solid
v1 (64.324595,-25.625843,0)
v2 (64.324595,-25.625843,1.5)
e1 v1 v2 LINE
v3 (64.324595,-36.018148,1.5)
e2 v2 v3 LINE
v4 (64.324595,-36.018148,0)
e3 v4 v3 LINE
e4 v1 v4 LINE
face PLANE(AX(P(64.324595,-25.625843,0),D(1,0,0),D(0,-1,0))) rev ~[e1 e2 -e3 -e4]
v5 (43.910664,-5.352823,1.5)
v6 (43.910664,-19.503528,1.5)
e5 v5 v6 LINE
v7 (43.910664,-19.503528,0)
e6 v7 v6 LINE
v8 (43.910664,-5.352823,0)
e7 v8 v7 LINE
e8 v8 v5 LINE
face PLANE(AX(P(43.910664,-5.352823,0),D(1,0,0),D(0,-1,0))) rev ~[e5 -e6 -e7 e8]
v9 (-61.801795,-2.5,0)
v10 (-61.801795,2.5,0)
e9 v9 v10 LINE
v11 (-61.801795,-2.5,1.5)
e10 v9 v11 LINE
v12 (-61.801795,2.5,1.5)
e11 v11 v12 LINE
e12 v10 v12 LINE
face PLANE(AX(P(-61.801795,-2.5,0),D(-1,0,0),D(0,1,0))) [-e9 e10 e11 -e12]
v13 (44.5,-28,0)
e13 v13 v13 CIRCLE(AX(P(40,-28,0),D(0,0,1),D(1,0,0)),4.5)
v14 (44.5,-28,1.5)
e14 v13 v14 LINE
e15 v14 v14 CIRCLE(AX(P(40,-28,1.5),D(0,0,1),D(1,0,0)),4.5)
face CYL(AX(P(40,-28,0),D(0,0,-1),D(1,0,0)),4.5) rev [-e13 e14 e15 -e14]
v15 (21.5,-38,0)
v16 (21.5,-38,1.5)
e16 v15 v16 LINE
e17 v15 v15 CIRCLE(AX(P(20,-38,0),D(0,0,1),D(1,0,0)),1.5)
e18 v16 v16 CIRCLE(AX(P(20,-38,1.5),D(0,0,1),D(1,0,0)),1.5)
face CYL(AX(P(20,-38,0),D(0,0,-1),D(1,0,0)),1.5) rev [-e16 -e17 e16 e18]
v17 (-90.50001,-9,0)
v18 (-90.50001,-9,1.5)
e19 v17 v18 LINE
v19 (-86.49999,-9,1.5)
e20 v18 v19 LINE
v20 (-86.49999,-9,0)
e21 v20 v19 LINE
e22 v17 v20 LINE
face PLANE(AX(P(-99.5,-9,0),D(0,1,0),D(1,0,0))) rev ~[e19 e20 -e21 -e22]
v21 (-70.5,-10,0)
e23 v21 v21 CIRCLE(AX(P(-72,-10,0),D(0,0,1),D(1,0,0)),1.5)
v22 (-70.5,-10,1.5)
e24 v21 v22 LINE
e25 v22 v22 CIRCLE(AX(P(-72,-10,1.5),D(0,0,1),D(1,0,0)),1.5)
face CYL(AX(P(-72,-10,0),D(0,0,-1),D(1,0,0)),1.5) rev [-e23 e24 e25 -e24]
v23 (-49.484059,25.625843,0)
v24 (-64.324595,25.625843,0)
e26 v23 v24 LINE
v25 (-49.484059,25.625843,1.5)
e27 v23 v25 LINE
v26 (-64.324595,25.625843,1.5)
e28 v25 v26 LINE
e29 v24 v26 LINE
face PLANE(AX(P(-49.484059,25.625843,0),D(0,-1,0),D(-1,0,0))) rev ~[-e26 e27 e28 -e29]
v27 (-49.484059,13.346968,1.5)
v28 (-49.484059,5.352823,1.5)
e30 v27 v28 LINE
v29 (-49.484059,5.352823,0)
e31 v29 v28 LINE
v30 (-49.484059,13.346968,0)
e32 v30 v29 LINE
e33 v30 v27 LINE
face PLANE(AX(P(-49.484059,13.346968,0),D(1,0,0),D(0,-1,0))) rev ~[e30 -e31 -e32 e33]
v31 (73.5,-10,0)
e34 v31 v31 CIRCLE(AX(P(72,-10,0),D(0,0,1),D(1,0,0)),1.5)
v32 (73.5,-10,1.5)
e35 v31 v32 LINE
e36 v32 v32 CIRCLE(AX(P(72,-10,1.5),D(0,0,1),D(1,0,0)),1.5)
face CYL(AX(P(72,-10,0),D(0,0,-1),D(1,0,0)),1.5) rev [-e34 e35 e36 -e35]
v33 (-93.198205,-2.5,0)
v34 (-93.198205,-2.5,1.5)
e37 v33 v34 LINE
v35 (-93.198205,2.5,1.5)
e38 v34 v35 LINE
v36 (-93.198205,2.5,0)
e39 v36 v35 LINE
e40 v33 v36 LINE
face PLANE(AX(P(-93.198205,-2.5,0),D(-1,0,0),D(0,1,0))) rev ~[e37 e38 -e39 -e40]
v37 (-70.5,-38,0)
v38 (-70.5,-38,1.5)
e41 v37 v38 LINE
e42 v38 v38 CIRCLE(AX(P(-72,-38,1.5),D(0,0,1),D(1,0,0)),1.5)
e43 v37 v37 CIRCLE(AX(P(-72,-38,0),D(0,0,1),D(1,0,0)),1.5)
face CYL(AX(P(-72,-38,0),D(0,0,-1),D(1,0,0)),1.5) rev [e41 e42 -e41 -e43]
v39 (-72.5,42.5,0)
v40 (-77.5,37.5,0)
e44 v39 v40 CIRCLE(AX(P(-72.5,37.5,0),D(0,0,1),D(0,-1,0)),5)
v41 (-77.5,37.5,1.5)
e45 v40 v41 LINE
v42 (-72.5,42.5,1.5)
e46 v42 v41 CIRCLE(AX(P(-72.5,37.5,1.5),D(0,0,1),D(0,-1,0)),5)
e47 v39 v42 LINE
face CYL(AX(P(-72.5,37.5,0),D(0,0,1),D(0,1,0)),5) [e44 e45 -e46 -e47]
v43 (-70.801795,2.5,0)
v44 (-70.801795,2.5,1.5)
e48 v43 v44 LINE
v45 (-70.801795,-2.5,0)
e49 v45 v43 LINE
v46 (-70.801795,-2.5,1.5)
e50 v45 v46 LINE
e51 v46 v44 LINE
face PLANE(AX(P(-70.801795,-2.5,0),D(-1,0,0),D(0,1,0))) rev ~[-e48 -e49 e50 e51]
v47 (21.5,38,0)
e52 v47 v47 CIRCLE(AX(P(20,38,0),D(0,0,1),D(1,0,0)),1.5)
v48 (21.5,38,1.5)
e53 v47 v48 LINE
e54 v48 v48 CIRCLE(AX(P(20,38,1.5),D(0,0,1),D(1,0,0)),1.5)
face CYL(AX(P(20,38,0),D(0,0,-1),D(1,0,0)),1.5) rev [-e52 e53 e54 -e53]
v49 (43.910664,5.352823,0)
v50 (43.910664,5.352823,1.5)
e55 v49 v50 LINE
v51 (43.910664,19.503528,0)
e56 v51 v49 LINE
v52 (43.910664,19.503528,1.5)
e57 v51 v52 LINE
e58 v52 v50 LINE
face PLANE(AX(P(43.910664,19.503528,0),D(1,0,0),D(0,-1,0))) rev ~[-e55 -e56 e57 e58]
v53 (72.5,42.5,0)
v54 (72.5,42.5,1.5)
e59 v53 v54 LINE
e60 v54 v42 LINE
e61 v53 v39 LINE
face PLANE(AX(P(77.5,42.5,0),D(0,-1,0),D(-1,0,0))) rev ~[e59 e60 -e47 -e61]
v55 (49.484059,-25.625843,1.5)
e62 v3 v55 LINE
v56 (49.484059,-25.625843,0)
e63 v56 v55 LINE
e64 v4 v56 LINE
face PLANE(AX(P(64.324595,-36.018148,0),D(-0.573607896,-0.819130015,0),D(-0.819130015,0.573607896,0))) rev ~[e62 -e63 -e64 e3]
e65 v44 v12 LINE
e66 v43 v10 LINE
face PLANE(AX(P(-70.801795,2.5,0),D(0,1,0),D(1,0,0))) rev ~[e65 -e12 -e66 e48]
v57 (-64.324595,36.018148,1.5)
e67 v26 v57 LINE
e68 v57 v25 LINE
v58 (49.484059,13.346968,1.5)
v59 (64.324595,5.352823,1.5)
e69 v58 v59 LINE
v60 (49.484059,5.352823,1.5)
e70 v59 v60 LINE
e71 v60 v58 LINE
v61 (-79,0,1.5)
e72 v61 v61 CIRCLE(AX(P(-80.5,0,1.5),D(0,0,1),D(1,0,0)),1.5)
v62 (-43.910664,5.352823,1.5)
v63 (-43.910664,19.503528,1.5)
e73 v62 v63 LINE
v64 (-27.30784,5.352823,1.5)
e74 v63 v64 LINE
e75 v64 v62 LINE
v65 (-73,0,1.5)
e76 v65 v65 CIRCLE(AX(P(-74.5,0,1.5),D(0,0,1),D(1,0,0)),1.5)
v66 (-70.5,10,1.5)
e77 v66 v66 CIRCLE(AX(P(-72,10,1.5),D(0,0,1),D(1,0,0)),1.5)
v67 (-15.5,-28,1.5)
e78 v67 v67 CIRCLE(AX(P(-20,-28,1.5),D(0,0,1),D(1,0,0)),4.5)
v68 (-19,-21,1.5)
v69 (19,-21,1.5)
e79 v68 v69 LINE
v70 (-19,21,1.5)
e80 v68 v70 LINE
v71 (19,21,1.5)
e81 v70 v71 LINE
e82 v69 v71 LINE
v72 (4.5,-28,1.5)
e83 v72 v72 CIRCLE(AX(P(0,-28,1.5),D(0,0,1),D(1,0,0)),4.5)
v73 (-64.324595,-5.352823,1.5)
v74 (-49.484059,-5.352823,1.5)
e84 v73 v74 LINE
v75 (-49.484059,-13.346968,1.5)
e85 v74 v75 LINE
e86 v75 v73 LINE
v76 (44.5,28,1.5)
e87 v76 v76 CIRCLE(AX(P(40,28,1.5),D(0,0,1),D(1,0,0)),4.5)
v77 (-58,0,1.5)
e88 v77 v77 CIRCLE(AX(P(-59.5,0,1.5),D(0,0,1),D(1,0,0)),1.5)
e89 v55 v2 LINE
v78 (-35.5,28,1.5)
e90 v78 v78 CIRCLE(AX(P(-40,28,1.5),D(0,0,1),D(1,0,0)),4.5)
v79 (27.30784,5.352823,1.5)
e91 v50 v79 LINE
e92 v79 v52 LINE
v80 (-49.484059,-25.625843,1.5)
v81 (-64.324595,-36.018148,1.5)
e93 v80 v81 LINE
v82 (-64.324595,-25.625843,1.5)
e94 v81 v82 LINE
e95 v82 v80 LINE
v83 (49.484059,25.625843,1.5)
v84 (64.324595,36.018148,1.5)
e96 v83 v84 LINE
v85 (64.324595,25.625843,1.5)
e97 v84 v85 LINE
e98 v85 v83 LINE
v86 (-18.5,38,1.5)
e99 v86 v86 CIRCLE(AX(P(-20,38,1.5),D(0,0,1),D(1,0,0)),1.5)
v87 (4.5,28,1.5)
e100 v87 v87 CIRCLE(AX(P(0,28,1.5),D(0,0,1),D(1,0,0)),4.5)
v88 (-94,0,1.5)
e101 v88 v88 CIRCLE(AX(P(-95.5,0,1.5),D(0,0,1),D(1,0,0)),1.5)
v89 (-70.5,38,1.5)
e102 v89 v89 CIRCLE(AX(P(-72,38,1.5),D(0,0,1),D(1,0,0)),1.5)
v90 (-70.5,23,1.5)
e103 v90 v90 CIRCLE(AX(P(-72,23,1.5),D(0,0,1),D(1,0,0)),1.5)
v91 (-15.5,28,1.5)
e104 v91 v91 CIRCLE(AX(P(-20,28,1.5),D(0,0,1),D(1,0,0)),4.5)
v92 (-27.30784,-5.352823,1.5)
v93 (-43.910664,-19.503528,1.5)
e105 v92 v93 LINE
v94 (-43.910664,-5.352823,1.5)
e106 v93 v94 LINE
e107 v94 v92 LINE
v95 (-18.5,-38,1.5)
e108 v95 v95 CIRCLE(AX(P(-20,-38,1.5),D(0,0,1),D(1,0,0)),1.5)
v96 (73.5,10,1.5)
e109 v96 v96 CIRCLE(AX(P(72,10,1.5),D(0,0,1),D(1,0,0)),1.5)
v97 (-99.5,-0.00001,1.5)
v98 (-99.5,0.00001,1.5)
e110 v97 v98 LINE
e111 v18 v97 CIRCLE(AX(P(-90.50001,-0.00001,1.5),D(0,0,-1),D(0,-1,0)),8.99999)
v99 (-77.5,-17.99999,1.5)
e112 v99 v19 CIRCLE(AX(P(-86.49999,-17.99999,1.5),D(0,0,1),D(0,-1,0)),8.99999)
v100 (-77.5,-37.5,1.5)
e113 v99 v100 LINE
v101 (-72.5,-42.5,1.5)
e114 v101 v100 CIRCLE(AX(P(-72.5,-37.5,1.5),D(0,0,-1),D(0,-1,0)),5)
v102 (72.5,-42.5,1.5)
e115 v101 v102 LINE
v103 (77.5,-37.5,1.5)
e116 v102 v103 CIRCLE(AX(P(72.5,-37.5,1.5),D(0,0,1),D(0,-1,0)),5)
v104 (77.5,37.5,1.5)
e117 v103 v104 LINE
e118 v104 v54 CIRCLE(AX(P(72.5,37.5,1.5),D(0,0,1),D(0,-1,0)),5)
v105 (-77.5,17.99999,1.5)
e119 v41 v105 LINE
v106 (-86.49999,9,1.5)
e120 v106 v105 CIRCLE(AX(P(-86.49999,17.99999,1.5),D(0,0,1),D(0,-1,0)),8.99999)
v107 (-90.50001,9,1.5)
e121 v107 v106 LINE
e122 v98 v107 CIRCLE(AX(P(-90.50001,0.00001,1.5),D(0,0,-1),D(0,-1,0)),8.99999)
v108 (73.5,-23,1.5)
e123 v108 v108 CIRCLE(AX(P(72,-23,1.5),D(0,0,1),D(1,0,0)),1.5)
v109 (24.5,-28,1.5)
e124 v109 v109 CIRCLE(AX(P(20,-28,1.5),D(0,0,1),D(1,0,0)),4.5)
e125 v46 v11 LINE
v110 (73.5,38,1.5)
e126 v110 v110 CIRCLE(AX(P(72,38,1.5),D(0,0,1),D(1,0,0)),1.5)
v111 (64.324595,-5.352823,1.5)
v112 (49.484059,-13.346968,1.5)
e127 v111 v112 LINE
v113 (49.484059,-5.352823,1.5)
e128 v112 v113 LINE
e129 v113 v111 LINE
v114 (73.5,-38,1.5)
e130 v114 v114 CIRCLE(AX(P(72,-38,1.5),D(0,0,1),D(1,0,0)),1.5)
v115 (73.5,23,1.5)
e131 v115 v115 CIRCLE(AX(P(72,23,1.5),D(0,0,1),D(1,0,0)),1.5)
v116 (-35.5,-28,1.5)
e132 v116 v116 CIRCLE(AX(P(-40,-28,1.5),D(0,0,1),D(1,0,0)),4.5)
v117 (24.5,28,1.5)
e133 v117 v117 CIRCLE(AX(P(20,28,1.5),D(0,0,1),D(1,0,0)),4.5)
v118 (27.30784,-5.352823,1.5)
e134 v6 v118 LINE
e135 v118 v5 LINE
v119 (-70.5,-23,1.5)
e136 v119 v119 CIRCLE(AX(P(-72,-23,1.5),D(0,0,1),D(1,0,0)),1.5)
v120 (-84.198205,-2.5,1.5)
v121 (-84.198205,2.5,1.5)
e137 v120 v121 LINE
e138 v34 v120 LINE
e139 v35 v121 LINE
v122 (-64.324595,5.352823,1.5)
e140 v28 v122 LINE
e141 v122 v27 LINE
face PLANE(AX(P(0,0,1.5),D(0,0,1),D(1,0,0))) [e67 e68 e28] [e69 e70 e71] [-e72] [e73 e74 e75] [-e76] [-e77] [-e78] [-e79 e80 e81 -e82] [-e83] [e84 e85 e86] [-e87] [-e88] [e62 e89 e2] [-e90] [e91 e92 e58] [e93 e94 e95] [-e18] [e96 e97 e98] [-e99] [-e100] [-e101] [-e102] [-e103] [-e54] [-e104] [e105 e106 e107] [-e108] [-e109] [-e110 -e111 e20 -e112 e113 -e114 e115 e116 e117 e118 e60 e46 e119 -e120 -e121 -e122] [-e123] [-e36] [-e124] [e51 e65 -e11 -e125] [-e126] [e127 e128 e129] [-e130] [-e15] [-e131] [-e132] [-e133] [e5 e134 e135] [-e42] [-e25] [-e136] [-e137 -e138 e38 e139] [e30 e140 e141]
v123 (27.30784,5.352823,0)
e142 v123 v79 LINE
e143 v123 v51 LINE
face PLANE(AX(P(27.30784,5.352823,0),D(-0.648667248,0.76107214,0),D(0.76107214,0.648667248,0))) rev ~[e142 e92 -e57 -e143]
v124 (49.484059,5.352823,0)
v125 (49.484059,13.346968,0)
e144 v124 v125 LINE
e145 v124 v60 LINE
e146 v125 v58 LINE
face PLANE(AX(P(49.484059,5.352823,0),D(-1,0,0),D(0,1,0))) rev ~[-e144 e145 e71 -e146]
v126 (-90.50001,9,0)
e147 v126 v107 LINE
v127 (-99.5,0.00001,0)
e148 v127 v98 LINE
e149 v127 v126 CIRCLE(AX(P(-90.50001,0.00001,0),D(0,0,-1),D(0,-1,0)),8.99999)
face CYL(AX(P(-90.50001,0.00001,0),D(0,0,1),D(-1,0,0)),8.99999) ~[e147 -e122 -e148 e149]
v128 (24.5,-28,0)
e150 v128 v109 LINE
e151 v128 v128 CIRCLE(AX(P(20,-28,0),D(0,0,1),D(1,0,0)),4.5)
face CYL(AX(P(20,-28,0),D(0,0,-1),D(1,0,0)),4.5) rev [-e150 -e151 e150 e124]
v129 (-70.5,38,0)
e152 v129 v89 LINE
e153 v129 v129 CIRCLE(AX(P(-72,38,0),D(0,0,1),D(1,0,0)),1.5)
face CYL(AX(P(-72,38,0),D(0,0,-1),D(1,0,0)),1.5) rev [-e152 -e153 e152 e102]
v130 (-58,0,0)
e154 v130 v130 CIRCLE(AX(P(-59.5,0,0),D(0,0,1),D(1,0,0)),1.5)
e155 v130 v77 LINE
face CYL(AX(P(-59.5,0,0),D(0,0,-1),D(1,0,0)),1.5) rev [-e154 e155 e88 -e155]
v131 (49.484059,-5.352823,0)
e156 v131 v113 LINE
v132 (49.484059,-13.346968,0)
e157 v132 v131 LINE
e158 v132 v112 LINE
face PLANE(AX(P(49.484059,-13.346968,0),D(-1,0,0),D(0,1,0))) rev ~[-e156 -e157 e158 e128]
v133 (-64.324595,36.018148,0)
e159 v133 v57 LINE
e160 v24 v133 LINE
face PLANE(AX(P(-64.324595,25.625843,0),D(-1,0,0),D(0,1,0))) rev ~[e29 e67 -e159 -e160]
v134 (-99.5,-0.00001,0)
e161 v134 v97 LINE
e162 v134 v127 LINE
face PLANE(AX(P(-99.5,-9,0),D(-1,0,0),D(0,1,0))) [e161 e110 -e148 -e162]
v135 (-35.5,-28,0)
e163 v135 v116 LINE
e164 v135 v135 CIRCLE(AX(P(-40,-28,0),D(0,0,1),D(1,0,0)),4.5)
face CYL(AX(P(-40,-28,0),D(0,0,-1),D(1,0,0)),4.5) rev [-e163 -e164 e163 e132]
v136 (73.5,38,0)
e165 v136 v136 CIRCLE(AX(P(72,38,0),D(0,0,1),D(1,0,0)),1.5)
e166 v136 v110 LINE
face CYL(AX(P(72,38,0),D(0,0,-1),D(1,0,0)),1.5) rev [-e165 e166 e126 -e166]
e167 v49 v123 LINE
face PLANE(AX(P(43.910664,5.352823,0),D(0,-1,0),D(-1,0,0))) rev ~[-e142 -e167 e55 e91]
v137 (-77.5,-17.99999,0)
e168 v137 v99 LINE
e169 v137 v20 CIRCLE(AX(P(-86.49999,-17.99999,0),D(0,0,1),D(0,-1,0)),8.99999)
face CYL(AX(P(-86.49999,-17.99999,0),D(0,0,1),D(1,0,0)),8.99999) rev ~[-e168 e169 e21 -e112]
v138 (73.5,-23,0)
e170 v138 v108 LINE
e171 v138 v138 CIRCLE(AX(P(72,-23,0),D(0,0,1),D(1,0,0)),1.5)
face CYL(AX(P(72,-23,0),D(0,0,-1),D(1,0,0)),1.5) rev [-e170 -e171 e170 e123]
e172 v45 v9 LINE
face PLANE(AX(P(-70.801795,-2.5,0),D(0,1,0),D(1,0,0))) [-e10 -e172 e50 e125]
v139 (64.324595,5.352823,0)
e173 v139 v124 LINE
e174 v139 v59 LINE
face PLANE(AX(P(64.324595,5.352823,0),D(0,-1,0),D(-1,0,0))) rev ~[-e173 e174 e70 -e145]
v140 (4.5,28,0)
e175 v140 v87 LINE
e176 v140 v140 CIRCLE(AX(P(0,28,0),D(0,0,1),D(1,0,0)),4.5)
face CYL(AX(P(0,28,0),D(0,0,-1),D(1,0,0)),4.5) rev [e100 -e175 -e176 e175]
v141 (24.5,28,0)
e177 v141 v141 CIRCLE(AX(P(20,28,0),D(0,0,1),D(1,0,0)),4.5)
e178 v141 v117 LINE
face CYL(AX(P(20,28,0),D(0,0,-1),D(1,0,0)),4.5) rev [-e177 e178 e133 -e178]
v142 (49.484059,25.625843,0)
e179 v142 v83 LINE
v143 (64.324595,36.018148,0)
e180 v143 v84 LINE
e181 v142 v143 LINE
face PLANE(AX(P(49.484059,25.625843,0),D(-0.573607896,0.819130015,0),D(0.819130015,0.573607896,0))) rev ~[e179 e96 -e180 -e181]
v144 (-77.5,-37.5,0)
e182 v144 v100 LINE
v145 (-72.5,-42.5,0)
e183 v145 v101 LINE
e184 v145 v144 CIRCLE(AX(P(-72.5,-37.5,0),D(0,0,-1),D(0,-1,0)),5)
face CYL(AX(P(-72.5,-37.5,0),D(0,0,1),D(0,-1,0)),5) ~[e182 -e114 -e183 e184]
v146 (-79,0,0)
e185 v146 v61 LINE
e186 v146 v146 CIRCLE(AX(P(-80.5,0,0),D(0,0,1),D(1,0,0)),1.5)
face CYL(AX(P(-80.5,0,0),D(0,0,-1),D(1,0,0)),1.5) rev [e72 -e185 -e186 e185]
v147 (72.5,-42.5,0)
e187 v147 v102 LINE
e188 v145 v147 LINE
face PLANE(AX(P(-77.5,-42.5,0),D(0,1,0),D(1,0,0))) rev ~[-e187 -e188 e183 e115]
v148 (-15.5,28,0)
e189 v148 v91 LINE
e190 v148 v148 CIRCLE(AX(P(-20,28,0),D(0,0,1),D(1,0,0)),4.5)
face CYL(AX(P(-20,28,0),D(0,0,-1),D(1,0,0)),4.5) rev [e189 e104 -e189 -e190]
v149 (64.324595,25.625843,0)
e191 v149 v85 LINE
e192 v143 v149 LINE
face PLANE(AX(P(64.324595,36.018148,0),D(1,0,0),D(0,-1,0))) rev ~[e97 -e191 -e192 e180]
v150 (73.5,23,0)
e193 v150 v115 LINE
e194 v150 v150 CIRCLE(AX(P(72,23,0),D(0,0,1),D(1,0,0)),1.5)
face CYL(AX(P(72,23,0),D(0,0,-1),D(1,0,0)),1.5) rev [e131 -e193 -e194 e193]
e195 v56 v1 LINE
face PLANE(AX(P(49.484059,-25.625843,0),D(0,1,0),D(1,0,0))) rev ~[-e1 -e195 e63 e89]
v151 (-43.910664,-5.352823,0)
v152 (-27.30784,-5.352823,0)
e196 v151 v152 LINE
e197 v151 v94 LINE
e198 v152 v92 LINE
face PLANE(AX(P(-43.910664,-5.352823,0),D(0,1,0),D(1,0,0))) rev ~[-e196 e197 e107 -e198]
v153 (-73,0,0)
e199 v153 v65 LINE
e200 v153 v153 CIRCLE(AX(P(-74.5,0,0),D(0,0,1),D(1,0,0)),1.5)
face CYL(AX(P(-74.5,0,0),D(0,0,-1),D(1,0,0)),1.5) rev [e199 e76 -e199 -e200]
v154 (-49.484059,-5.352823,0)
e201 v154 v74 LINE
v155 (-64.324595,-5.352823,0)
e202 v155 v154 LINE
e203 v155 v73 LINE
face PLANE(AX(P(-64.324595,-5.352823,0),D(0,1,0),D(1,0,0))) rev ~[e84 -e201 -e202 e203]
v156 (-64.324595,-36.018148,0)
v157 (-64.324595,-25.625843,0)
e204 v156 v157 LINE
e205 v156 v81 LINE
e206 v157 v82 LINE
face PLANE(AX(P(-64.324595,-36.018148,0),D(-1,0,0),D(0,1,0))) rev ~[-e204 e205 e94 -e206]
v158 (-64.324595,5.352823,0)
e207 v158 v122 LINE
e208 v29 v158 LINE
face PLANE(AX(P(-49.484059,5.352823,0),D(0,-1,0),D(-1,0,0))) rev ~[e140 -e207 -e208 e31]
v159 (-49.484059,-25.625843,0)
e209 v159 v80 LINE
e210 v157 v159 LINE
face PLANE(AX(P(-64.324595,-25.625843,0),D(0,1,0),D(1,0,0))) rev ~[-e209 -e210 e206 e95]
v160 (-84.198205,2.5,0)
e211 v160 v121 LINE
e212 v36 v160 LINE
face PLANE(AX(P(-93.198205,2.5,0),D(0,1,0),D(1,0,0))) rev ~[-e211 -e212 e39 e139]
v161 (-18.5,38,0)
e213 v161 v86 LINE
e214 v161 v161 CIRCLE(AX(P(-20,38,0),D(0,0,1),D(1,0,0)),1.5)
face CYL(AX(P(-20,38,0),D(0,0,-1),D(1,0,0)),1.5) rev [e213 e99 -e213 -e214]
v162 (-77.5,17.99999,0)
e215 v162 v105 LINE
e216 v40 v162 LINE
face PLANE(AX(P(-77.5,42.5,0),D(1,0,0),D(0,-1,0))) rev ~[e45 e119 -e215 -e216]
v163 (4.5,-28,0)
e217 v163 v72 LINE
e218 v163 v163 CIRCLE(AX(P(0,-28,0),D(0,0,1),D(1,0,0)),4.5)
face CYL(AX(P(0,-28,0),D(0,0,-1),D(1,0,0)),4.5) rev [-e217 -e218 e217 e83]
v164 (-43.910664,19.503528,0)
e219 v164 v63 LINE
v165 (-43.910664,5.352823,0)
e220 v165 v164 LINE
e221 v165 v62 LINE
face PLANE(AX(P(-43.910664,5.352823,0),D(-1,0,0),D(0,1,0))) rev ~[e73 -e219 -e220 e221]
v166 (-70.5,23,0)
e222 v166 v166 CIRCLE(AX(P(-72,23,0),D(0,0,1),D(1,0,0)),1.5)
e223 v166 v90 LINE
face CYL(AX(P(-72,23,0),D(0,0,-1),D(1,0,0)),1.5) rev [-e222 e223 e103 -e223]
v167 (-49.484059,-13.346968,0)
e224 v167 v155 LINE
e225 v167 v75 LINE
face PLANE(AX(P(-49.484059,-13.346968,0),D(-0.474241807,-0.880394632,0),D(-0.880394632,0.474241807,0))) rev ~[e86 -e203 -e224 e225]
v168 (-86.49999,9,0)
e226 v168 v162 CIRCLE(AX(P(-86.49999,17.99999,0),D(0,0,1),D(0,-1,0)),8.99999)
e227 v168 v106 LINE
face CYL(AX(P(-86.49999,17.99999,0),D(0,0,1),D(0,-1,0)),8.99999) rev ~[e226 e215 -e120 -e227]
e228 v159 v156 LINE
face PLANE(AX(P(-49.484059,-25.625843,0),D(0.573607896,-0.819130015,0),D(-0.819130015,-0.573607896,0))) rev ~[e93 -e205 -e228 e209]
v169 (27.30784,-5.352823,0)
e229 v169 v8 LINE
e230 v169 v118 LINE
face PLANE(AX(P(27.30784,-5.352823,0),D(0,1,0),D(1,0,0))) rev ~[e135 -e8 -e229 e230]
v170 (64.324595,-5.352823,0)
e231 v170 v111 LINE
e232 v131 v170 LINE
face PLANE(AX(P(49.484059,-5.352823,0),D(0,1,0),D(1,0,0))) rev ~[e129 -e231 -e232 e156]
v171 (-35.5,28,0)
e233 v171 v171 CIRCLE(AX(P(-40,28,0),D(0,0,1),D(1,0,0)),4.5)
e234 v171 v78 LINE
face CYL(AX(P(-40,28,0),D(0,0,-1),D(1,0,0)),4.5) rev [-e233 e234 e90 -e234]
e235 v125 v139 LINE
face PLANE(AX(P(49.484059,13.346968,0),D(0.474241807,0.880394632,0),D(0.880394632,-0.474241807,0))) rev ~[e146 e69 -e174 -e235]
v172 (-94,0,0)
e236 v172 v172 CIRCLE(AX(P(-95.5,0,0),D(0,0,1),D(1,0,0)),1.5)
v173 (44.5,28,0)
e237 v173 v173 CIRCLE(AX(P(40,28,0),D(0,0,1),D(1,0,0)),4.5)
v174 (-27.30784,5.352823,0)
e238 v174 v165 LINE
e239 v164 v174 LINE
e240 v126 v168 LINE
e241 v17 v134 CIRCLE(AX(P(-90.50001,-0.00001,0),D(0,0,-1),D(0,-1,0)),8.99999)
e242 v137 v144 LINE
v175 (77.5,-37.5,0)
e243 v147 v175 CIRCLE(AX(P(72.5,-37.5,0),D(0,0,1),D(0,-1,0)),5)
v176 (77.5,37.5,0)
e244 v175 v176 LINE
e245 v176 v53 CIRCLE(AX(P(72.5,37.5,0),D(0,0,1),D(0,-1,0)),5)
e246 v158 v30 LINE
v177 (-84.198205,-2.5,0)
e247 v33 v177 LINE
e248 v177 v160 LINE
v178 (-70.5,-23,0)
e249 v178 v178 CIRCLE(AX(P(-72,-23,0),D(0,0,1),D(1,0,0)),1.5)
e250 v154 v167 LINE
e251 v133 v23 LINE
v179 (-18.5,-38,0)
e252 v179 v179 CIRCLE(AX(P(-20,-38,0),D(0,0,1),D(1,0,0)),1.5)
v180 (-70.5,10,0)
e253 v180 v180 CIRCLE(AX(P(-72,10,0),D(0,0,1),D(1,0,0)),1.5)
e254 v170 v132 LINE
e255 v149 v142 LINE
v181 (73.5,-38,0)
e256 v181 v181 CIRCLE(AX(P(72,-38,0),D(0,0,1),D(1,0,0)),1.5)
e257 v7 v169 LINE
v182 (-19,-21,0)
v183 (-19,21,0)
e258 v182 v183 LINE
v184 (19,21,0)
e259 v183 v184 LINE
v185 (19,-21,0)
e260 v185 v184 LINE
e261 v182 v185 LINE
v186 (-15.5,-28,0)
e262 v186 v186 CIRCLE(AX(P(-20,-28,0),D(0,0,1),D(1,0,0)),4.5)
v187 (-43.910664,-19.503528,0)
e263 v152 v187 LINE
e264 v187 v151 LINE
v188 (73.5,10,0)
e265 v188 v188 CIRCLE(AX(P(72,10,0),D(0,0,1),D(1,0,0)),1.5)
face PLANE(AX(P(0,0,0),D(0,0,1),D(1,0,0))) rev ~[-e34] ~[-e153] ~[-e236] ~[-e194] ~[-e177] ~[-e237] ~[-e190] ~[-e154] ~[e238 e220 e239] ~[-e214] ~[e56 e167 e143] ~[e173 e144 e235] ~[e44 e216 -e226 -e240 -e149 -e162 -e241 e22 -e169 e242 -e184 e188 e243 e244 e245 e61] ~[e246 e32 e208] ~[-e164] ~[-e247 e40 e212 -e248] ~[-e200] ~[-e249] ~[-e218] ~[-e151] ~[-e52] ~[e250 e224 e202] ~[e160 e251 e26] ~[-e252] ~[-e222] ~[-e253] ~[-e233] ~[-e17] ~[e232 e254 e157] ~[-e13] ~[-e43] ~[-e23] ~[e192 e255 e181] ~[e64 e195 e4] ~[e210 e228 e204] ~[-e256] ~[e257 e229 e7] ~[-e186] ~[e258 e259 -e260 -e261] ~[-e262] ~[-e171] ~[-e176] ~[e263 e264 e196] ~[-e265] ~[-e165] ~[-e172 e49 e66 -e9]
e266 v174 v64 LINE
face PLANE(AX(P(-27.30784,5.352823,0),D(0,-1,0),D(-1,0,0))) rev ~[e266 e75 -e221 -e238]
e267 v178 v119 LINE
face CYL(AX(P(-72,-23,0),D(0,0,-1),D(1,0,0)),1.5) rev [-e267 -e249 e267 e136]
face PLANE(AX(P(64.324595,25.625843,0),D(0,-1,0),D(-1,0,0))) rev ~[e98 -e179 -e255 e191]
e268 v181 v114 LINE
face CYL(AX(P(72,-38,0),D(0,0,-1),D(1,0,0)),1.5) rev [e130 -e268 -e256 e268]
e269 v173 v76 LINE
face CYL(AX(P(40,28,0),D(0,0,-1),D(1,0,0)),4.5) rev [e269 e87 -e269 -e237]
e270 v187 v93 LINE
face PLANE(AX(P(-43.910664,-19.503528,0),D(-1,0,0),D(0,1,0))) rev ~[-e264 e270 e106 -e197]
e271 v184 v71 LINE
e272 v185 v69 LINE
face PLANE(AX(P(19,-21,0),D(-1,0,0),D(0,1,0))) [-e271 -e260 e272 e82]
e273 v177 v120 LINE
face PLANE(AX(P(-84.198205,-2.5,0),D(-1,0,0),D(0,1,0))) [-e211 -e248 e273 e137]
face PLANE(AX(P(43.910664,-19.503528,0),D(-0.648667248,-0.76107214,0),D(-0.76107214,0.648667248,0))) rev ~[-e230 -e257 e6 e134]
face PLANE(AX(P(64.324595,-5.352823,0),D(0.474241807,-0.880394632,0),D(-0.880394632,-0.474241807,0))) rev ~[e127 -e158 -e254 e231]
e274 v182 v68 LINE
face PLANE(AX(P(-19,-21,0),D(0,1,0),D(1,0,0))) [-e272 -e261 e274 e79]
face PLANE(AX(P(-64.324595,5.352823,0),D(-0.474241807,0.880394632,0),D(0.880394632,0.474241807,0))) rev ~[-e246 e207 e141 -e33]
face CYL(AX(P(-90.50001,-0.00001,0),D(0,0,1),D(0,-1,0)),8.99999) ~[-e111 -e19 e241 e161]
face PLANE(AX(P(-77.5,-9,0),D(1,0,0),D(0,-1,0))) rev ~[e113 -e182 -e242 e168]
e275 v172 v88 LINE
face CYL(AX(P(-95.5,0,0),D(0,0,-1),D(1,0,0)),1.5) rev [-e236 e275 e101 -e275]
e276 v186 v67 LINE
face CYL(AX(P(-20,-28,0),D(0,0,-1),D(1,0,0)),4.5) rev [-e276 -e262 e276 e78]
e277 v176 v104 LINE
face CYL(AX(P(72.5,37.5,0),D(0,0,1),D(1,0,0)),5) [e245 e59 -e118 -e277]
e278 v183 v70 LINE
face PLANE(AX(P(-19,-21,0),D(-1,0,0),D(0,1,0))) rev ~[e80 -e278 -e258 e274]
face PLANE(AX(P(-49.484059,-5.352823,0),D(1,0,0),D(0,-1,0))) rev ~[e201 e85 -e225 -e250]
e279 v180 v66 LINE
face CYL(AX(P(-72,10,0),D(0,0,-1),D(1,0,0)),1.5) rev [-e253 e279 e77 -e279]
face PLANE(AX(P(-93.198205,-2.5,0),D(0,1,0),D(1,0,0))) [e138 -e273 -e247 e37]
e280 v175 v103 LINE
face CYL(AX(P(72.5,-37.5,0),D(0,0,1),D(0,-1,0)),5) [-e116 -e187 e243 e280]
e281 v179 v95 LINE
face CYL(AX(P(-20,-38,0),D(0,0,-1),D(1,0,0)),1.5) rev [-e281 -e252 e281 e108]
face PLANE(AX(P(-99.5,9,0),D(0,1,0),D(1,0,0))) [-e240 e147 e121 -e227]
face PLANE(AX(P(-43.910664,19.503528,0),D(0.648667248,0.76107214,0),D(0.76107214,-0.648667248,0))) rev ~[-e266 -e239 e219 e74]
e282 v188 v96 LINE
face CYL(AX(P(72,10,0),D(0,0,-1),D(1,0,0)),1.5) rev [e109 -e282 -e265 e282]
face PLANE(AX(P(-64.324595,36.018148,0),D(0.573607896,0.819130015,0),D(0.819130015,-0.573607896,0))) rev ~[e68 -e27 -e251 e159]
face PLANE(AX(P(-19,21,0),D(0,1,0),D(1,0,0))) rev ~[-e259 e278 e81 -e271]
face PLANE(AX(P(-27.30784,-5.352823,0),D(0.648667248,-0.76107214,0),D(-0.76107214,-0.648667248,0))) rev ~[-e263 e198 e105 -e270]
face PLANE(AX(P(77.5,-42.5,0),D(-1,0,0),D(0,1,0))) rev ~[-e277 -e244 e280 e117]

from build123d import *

# Parameters (mm, degrees)
F0_R     = 1.5
F0_R_2   = 4.5
F0_W     = 9
F0_H     = 5
F0_W_2   = 38
F0_H_2   = 42
F0_W_3   = 22
F0_H_3   = 18
F1_DEPTH = 1.5
F2_R     = 5
F3_R     = 8.99999


# Not quite as in the source:
# - a fillet or chamfer is up to 0.001 mm smaller than in the source, because OpenCascade refuses the exact size


with BuildPart() as f1:
    # F0 (on Top) → F1 (new body)
    with BuildSketch(Plane.XY):
        Polygon((-77.5, -42.5), (77.5, -42.5), (77.5, 42.5), (-77.5, 42.5), (-77.5, 9), (-77.5, -9), align=None)
        with Locations((-72, -38)):
            Circle(F0_R, mode=Mode.SUBTRACT)
        Polygon((-49.4840586844, -25.6258432192), (-64.3245950341, -36.0181480646), (-64.3245950341, -25.6258432192), align=None, mode=Mode.SUBTRACT)
        with Locations((-72, -23)):
            Circle(F0_R, mode=Mode.SUBTRACT)
        with Locations((-20, -38)):
            Circle(F0_R, mode=Mode.SUBTRACT)
        with Locations((-40, -28)):
            Circle(F0_R_2, mode=Mode.SUBTRACT)
        with Locations((-20, -28)):
            Circle(F0_R_2, mode=Mode.SUBTRACT)
        with Locations((-72, -10)):
            Circle(F0_R, mode=Mode.SUBTRACT)
        Polygon((-49.4840586844, -13.3469680754), (-64.3245950341, -5.3528225981), (-49.4840586844, -5.3528225981), align=None, mode=Mode.SUBTRACT)
        Polygon((-43.9106635749, -19.5035282522), (-43.9106635749, -5.3528225981), (-27.3078400642, -5.3528225981), align=None, mode=Mode.SUBTRACT)
        with Locations((20, -38)):
            Circle(F0_R, mode=Mode.SUBTRACT)
        with Locations((0, -28)):
            Circle(F0_R_2, mode=Mode.SUBTRACT)
        with Locations((20, -28)):
            Circle(F0_R_2, mode=Mode.SUBTRACT)
        with Locations((72, -38)):
            Circle(F0_R, mode=Mode.SUBTRACT)
        with Locations((40, -28)):
            Circle(F0_R_2, mode=Mode.SUBTRACT)
        Polygon((64.3245950341, -36.0181480646), (49.4840586844, -25.6258432192), (64.3245950341, -25.6258432192), align=None, mode=Mode.SUBTRACT)
        with Locations((72, -23)):
            Circle(F0_R, mode=Mode.SUBTRACT)
        Polygon((43.9106635749, -19.5035282522), (27.3078400642, -5.3528225981), (43.9106635749, -5.3528225981), align=None, mode=Mode.SUBTRACT)
        Polygon((64.3245950341, -5.3528225981), (49.4840586844, -13.3469680754), (49.4840586844, -5.3528225981), align=None, mode=Mode.SUBTRACT)
        with Locations((72, -10)):
            Circle(F0_R, mode=Mode.SUBTRACT)
        with Locations((-74.5, 0)):
            Circle(F0_R, mode=Mode.SUBTRACT)
        with Locations((-66.3017949164, 0)):
            Rectangle(F0_W, F0_H, mode=Mode.SUBTRACT)
        with Locations((-59.5, 0)):
            Circle(F0_R, mode=Mode.SUBTRACT)
        with Locations((-72, 10)):
            Circle(F0_R, mode=Mode.SUBTRACT)
        Polygon((-49.4840586844, 5.3528225981), (-64.3245950341, 5.3528225981), (-49.4840586844, 13.3469680754), align=None, mode=Mode.SUBTRACT)
        Polygon((-43.9106635749, 5.3528225981), (-43.9106635749, 19.5035282522), (-27.3078400642, 5.3528225981), align=None, mode=Mode.SUBTRACT)
        with Locations((-72, 23)):
            Circle(F0_R, mode=Mode.SUBTRACT)
        Polygon((-64.3245950341, 36.0181480646), (-49.4840586844, 25.6258432192), (-64.3245950341, 25.6258432192), align=None, mode=Mode.SUBTRACT)
        with Locations((-72, 38)):
            Circle(F0_R, mode=Mode.SUBTRACT)
        with Locations((-40, 28)):
            Circle(F0_R_2, mode=Mode.SUBTRACT)
        with Locations((-20, 28)):
            Circle(F0_R_2, mode=Mode.SUBTRACT)
        with Locations((-20, 38)):
            Circle(F0_R, mode=Mode.SUBTRACT)
        Rectangle(F0_W_2, F0_H_2, mode=Mode.SUBTRACT)
        Polygon((49.4840586844, 5.3528225981), (49.4840586844, 13.3469680754), (64.3245950341, 5.3528225981), align=None, mode=Mode.SUBTRACT)
        with Locations((72, 10)):
            Circle(F0_R, mode=Mode.SUBTRACT)
        Polygon((43.9106635749, 19.5035282522), (43.9106635749, 5.3528225981), (27.3078400642, 5.3528225981), align=None, mode=Mode.SUBTRACT)
        with Locations((0, 28)):
            Circle(F0_R_2, mode=Mode.SUBTRACT)
        with Locations((20, 28)):
            Circle(F0_R_2, mode=Mode.SUBTRACT)
        with Locations((20, 38)):
            Circle(F0_R, mode=Mode.SUBTRACT)
        with Locations((40, 28)):
            Circle(F0_R_2, mode=Mode.SUBTRACT)
        with Locations((72, 23)):
            Circle(F0_R, mode=Mode.SUBTRACT)
        Polygon((64.3245950341, 25.6258432192), (49.4840586844, 25.6258432192), (64.3245950341, 36.0181480646), align=None, mode=Mode.SUBTRACT)
        with Locations((72, 38)):
            Circle(F0_R, mode=Mode.SUBTRACT)
        with Locations((-88.5, 0)):
            Rectangle(F0_W_3, F0_H_3)
        with Locations((-95.5, 0)):
            Circle(F0_R, mode=Mode.SUBTRACT)
        with Locations((-88.6982050836, 0)):
            Rectangle(F0_W, F0_H, mode=Mode.SUBTRACT)
        with Locations((-80.5, 0)):
            Circle(F0_R, mode=Mode.SUBTRACT)
    extrude(amount=F1_DEPTH)

    # F2
    f2_edges = [f1.edges().sort_by_distance(p)[0] for p in [
        (-77.5, 42.5, 0.75),
        (77.5, 42.5, 0.75),
        (77.5, -42.5, 0.75),
        (-77.5, -42.5, 0.75),
    ]]
    fillet(f2_edges, radius=F2_R)

    # F3 (radius 9 in the source; OpenCascade refuses exactly that, so slightly less here)
    f3_edges = [f1.edges().sort_by_distance(p)[0] for p in [
        (-77.5, -9, 0.75),
        (-77.5, 9, 0.75),
        (-99.5, -9, 0.75),
        (-99.5, 9, 0.75),
    ]]
    fillet(f3_edges, radius=F3_R)


solid = f1.part
